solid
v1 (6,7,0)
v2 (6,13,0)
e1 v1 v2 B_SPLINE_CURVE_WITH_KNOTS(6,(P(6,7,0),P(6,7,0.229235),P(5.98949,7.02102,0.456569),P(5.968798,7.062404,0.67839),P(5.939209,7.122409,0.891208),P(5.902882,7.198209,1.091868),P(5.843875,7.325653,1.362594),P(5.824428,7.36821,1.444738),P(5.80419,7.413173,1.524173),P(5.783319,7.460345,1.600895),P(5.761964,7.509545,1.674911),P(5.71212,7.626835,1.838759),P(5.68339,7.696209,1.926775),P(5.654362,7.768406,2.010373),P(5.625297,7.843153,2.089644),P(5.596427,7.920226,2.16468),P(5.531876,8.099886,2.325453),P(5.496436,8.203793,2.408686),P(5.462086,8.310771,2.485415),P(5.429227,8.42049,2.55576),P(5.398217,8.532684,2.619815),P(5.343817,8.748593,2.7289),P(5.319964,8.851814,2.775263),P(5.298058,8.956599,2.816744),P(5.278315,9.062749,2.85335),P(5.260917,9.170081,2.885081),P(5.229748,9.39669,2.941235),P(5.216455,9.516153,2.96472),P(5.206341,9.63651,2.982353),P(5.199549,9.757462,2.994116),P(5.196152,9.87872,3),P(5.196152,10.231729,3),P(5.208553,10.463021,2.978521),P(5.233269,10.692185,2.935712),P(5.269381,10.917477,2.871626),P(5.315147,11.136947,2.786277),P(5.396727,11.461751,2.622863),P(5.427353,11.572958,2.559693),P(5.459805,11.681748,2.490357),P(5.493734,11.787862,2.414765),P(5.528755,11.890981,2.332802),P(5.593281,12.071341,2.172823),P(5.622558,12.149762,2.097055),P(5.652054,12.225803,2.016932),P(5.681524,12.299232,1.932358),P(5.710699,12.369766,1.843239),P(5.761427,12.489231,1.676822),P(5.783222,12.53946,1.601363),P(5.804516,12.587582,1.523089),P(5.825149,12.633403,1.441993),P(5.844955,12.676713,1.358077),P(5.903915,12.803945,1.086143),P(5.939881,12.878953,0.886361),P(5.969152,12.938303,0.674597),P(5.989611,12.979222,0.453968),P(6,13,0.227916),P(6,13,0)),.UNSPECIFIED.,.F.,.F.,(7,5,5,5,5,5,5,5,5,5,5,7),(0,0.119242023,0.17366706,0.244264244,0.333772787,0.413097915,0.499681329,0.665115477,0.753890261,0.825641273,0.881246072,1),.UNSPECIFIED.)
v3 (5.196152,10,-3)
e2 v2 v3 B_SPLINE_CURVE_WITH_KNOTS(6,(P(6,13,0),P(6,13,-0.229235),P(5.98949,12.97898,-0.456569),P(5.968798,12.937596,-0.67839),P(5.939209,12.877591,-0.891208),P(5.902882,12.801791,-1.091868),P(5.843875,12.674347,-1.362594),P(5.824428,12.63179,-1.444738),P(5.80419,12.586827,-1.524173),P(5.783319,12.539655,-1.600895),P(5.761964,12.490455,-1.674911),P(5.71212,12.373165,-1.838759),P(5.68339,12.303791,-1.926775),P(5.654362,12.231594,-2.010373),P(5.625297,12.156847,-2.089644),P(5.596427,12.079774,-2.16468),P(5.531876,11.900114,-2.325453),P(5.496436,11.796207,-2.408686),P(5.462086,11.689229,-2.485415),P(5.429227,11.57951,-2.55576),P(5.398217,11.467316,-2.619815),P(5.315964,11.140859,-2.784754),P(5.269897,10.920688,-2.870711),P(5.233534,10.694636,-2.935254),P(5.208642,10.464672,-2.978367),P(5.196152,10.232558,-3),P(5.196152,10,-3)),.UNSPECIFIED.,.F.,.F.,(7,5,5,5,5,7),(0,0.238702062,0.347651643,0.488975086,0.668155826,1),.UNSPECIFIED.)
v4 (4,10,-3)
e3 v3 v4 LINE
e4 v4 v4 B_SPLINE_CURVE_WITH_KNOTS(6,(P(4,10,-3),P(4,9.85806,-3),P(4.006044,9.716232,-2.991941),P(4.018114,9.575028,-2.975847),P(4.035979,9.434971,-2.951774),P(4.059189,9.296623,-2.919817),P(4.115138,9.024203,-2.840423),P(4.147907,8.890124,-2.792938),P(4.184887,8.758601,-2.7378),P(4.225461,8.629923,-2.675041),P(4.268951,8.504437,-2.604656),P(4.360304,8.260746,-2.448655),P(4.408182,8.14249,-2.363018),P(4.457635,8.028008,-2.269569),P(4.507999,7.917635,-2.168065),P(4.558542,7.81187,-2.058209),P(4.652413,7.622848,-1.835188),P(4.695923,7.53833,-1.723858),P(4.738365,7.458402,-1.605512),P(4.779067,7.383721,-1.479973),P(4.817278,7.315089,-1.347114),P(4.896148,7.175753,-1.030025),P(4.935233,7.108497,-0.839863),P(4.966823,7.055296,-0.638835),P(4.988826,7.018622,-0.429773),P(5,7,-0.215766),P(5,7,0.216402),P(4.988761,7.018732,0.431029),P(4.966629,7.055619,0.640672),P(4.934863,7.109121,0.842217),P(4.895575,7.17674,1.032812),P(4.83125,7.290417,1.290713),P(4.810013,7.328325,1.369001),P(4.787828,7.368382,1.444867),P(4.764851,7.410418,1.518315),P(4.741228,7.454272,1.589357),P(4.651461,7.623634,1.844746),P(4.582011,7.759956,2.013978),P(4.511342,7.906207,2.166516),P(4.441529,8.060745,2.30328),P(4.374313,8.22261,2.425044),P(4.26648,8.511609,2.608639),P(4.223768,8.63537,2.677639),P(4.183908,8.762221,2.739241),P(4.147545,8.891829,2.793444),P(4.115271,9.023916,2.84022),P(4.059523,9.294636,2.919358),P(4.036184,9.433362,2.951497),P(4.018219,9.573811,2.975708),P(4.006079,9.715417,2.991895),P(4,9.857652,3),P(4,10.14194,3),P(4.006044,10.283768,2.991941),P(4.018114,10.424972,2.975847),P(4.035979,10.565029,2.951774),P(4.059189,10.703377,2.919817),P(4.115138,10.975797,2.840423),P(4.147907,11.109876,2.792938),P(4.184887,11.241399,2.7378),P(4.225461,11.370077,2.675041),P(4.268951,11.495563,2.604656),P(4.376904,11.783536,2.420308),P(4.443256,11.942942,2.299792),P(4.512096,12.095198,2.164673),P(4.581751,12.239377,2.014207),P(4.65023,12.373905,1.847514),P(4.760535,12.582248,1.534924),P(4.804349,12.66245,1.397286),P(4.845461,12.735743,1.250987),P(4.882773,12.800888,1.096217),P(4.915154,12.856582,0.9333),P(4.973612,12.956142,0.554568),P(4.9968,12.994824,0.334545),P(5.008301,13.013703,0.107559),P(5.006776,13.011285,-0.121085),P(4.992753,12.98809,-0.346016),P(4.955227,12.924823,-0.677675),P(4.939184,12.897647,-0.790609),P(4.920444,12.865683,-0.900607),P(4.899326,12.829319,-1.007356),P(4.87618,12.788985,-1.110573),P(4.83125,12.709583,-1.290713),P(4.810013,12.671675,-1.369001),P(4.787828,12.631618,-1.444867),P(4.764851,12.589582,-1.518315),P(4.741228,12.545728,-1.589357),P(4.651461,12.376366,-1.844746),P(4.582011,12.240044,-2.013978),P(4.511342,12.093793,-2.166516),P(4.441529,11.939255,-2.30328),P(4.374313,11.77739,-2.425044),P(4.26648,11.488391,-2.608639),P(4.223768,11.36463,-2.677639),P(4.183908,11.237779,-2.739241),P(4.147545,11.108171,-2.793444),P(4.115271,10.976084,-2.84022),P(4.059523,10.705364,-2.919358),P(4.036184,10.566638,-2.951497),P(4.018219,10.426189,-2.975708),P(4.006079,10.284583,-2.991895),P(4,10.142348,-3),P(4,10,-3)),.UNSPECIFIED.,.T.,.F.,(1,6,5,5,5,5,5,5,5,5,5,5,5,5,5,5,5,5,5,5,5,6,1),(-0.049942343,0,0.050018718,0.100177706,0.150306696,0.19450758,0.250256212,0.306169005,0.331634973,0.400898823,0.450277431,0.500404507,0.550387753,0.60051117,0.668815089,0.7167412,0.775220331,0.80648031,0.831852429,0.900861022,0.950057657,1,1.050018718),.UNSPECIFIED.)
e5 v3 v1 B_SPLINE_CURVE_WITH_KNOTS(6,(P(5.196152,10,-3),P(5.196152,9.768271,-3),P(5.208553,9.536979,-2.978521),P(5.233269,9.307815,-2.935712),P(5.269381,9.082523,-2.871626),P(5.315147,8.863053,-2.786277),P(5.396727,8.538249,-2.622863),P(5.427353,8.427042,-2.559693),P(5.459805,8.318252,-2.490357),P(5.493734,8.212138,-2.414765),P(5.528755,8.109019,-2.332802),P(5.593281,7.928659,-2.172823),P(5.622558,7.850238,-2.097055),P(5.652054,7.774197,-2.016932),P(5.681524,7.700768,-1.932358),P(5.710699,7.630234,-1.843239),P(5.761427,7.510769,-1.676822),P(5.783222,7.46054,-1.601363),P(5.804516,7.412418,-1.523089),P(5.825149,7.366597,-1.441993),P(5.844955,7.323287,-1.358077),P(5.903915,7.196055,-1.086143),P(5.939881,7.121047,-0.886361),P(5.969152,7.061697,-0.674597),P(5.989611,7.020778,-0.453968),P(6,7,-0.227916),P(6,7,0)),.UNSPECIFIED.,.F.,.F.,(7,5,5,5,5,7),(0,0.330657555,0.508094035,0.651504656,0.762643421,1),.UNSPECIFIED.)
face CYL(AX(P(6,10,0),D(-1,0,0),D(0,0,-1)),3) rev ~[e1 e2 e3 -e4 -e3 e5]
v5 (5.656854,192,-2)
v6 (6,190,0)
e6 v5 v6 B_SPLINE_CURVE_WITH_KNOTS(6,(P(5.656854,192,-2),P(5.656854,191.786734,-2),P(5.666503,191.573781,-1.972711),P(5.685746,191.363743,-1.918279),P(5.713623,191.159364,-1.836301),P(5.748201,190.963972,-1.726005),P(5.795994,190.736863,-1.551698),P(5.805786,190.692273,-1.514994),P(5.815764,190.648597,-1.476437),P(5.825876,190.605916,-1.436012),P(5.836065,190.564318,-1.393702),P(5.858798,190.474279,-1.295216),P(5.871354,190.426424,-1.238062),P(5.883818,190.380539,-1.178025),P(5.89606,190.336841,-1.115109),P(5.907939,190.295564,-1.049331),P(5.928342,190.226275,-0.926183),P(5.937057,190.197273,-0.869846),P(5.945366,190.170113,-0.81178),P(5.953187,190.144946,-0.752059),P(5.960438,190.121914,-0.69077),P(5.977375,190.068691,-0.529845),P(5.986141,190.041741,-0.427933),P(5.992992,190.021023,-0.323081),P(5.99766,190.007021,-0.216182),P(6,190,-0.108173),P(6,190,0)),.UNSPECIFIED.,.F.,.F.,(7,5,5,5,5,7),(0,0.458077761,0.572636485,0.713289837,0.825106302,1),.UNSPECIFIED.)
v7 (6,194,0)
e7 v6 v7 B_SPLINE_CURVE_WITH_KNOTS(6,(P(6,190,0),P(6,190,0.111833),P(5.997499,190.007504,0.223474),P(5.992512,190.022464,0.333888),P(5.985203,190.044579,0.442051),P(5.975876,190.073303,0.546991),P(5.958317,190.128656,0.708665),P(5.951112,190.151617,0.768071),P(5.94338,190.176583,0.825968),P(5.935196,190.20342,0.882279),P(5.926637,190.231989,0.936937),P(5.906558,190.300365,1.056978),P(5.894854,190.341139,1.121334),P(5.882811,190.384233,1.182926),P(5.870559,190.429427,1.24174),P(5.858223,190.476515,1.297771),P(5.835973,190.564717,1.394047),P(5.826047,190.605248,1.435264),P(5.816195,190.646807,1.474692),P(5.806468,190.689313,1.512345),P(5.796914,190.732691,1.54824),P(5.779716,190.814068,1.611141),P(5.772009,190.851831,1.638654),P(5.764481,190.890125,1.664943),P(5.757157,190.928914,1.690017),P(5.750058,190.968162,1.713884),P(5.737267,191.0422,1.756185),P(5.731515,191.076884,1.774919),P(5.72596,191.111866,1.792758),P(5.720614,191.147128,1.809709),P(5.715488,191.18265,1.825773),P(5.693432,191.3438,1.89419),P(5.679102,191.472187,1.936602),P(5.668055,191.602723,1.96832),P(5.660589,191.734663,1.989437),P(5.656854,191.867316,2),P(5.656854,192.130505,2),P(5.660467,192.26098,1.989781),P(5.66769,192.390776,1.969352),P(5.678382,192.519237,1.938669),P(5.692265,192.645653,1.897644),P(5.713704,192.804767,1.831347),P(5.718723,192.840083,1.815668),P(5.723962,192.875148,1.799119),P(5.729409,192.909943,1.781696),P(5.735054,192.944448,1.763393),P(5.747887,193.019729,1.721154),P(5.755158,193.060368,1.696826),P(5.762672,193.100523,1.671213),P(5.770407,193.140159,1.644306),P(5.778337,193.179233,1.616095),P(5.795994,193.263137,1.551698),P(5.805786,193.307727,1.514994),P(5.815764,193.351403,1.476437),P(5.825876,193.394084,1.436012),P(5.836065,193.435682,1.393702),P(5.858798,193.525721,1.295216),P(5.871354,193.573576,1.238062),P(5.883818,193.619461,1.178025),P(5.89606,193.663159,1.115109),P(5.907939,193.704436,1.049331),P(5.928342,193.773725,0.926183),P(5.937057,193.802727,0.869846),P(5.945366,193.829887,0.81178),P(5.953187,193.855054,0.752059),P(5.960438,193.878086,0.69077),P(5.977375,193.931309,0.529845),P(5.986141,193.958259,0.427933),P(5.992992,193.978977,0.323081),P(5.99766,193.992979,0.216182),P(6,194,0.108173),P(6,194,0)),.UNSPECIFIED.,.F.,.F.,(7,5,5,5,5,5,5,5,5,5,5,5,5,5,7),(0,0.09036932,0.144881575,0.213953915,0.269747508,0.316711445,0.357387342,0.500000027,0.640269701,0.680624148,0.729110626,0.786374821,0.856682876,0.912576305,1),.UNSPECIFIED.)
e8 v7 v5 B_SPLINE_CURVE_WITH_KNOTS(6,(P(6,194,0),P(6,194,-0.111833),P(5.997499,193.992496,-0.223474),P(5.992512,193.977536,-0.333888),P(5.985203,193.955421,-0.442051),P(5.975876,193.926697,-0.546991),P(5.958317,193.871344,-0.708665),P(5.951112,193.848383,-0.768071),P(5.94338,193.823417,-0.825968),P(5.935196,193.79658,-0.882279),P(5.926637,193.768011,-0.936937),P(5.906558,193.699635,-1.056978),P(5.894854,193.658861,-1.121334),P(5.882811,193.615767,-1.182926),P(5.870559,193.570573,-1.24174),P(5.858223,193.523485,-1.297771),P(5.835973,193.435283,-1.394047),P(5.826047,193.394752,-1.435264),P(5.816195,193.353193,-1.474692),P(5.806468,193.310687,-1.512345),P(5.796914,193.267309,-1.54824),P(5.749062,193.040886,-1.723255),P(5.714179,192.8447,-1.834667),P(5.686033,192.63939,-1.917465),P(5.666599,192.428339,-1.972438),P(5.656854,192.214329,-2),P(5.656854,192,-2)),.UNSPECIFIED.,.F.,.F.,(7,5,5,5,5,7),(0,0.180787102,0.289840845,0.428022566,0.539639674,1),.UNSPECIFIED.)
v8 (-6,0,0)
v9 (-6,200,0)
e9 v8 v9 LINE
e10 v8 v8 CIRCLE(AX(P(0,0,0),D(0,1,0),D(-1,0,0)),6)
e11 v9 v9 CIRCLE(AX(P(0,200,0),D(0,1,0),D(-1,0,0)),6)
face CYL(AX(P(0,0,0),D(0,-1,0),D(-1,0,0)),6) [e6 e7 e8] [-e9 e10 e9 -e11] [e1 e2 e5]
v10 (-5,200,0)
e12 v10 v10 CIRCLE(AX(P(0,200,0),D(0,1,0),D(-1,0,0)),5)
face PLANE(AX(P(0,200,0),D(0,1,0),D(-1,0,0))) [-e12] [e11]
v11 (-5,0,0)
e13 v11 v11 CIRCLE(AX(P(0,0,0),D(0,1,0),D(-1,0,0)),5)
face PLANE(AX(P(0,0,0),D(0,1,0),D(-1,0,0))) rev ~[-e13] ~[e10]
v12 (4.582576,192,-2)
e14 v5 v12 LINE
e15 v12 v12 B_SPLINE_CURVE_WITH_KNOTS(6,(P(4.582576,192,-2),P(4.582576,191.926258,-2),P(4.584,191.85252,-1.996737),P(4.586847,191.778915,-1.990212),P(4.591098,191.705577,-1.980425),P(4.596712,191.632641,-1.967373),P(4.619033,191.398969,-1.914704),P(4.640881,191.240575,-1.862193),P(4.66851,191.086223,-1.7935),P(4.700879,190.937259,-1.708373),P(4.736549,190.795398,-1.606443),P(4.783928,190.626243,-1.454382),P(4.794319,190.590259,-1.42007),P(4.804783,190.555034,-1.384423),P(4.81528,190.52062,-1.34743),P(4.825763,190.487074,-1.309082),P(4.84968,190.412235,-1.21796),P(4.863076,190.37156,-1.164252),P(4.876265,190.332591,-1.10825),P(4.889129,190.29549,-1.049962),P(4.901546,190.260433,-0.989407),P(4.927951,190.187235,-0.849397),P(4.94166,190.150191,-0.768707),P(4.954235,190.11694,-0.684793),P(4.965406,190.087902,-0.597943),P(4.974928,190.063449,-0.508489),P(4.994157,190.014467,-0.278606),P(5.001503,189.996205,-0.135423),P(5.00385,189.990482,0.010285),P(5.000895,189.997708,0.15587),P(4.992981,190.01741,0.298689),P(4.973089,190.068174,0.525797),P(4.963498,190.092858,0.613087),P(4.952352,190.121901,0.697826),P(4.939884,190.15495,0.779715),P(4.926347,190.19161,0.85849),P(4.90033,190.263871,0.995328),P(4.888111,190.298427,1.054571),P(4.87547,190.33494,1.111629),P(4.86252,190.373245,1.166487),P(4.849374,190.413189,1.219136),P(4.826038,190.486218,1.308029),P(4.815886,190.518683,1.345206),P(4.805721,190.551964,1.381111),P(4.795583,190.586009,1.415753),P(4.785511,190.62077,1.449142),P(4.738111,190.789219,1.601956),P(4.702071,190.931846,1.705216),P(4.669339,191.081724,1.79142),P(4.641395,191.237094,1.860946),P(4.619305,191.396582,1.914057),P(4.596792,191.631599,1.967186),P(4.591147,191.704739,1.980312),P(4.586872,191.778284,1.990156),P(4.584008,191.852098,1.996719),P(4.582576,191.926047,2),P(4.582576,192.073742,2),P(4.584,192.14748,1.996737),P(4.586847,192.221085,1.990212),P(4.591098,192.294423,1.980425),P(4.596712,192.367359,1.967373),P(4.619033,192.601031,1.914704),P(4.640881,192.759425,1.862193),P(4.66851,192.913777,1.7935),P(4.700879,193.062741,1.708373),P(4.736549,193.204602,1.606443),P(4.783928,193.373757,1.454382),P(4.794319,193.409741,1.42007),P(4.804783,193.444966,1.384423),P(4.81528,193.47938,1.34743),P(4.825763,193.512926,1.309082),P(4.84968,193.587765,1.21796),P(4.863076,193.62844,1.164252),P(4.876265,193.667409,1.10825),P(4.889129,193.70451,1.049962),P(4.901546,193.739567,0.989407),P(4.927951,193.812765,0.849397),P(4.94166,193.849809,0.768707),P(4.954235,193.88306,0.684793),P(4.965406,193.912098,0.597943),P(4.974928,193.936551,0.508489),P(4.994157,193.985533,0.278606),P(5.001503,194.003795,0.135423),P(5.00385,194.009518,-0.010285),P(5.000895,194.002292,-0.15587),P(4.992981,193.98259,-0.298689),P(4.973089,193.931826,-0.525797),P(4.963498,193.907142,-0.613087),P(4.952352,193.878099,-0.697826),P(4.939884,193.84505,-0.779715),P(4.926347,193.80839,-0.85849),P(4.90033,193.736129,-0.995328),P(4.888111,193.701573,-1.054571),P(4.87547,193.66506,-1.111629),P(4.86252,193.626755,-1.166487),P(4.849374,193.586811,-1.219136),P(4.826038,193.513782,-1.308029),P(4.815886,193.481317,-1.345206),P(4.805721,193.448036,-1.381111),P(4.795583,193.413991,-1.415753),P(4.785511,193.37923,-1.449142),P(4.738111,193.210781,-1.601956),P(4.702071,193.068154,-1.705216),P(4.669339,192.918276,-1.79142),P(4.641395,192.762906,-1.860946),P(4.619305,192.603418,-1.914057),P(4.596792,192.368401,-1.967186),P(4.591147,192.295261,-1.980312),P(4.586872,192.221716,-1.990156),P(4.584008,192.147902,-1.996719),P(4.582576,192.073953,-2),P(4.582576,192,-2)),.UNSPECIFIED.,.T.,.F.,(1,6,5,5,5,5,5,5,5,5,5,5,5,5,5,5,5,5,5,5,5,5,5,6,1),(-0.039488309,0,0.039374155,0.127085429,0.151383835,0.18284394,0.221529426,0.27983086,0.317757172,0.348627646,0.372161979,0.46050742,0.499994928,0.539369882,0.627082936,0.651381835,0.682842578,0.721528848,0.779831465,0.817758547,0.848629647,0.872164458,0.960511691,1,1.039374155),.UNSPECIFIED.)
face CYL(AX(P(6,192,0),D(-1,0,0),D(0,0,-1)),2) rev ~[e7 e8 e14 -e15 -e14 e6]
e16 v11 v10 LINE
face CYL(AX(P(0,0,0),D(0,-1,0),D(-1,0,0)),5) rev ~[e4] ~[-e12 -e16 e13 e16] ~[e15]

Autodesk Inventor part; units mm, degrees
ref_plane "XZ Plane" through (0, 0, 0) normal (0, 1, 0) x (-1, 0, 0)
ref_plane "XY Plane" through (0, 0, 0) normal (0, 0, 1) x (1, 0, 0)
sketch "Sketch1" plane through (0, 0, 0) normal (0, 1, 0) x (-1, 0, 0)
  circle A0 centre (0, 0) radius 5
  circle A1 centre (0, 0) radius 6
  dimension "d0" = 12
  dimension "d1" = 1
extrude "Extrusion1" add sketch "Sketch1" along normal blind 200
ref_plane "Work Plane3" through (6, 0, 0) normal (1, 0, 0) x (0, 1, 0)
sketch "Sketch2" plane through (6, 0, 0) normal (1, 0, 0) x (0, 1, 0)
  line L0 (0, -6) -> (200, -6) projected
  line L1 (0, 6) -> (200, 6) projected
  line L2 (200, -6) -> (200, 6) projected
  line L3 (-40, 0) -> (240, 0) projected
  point P0 (0, 0)
  point P1 (10, 0)
  point P2 (192, 0)
hole "Hole1" at (6, 10, 0) direction (-1, 0, 0) diameter 6 end up to surface
hole "Hole2" at (6, 192, 0) direction (-1, 0, 0) diameter 4 end up to surface
equation "\"d2\" = pipe_length"
equation "\"pipe_length\" = 200"
properties part number "pipe" material "Aluminum 6061"
